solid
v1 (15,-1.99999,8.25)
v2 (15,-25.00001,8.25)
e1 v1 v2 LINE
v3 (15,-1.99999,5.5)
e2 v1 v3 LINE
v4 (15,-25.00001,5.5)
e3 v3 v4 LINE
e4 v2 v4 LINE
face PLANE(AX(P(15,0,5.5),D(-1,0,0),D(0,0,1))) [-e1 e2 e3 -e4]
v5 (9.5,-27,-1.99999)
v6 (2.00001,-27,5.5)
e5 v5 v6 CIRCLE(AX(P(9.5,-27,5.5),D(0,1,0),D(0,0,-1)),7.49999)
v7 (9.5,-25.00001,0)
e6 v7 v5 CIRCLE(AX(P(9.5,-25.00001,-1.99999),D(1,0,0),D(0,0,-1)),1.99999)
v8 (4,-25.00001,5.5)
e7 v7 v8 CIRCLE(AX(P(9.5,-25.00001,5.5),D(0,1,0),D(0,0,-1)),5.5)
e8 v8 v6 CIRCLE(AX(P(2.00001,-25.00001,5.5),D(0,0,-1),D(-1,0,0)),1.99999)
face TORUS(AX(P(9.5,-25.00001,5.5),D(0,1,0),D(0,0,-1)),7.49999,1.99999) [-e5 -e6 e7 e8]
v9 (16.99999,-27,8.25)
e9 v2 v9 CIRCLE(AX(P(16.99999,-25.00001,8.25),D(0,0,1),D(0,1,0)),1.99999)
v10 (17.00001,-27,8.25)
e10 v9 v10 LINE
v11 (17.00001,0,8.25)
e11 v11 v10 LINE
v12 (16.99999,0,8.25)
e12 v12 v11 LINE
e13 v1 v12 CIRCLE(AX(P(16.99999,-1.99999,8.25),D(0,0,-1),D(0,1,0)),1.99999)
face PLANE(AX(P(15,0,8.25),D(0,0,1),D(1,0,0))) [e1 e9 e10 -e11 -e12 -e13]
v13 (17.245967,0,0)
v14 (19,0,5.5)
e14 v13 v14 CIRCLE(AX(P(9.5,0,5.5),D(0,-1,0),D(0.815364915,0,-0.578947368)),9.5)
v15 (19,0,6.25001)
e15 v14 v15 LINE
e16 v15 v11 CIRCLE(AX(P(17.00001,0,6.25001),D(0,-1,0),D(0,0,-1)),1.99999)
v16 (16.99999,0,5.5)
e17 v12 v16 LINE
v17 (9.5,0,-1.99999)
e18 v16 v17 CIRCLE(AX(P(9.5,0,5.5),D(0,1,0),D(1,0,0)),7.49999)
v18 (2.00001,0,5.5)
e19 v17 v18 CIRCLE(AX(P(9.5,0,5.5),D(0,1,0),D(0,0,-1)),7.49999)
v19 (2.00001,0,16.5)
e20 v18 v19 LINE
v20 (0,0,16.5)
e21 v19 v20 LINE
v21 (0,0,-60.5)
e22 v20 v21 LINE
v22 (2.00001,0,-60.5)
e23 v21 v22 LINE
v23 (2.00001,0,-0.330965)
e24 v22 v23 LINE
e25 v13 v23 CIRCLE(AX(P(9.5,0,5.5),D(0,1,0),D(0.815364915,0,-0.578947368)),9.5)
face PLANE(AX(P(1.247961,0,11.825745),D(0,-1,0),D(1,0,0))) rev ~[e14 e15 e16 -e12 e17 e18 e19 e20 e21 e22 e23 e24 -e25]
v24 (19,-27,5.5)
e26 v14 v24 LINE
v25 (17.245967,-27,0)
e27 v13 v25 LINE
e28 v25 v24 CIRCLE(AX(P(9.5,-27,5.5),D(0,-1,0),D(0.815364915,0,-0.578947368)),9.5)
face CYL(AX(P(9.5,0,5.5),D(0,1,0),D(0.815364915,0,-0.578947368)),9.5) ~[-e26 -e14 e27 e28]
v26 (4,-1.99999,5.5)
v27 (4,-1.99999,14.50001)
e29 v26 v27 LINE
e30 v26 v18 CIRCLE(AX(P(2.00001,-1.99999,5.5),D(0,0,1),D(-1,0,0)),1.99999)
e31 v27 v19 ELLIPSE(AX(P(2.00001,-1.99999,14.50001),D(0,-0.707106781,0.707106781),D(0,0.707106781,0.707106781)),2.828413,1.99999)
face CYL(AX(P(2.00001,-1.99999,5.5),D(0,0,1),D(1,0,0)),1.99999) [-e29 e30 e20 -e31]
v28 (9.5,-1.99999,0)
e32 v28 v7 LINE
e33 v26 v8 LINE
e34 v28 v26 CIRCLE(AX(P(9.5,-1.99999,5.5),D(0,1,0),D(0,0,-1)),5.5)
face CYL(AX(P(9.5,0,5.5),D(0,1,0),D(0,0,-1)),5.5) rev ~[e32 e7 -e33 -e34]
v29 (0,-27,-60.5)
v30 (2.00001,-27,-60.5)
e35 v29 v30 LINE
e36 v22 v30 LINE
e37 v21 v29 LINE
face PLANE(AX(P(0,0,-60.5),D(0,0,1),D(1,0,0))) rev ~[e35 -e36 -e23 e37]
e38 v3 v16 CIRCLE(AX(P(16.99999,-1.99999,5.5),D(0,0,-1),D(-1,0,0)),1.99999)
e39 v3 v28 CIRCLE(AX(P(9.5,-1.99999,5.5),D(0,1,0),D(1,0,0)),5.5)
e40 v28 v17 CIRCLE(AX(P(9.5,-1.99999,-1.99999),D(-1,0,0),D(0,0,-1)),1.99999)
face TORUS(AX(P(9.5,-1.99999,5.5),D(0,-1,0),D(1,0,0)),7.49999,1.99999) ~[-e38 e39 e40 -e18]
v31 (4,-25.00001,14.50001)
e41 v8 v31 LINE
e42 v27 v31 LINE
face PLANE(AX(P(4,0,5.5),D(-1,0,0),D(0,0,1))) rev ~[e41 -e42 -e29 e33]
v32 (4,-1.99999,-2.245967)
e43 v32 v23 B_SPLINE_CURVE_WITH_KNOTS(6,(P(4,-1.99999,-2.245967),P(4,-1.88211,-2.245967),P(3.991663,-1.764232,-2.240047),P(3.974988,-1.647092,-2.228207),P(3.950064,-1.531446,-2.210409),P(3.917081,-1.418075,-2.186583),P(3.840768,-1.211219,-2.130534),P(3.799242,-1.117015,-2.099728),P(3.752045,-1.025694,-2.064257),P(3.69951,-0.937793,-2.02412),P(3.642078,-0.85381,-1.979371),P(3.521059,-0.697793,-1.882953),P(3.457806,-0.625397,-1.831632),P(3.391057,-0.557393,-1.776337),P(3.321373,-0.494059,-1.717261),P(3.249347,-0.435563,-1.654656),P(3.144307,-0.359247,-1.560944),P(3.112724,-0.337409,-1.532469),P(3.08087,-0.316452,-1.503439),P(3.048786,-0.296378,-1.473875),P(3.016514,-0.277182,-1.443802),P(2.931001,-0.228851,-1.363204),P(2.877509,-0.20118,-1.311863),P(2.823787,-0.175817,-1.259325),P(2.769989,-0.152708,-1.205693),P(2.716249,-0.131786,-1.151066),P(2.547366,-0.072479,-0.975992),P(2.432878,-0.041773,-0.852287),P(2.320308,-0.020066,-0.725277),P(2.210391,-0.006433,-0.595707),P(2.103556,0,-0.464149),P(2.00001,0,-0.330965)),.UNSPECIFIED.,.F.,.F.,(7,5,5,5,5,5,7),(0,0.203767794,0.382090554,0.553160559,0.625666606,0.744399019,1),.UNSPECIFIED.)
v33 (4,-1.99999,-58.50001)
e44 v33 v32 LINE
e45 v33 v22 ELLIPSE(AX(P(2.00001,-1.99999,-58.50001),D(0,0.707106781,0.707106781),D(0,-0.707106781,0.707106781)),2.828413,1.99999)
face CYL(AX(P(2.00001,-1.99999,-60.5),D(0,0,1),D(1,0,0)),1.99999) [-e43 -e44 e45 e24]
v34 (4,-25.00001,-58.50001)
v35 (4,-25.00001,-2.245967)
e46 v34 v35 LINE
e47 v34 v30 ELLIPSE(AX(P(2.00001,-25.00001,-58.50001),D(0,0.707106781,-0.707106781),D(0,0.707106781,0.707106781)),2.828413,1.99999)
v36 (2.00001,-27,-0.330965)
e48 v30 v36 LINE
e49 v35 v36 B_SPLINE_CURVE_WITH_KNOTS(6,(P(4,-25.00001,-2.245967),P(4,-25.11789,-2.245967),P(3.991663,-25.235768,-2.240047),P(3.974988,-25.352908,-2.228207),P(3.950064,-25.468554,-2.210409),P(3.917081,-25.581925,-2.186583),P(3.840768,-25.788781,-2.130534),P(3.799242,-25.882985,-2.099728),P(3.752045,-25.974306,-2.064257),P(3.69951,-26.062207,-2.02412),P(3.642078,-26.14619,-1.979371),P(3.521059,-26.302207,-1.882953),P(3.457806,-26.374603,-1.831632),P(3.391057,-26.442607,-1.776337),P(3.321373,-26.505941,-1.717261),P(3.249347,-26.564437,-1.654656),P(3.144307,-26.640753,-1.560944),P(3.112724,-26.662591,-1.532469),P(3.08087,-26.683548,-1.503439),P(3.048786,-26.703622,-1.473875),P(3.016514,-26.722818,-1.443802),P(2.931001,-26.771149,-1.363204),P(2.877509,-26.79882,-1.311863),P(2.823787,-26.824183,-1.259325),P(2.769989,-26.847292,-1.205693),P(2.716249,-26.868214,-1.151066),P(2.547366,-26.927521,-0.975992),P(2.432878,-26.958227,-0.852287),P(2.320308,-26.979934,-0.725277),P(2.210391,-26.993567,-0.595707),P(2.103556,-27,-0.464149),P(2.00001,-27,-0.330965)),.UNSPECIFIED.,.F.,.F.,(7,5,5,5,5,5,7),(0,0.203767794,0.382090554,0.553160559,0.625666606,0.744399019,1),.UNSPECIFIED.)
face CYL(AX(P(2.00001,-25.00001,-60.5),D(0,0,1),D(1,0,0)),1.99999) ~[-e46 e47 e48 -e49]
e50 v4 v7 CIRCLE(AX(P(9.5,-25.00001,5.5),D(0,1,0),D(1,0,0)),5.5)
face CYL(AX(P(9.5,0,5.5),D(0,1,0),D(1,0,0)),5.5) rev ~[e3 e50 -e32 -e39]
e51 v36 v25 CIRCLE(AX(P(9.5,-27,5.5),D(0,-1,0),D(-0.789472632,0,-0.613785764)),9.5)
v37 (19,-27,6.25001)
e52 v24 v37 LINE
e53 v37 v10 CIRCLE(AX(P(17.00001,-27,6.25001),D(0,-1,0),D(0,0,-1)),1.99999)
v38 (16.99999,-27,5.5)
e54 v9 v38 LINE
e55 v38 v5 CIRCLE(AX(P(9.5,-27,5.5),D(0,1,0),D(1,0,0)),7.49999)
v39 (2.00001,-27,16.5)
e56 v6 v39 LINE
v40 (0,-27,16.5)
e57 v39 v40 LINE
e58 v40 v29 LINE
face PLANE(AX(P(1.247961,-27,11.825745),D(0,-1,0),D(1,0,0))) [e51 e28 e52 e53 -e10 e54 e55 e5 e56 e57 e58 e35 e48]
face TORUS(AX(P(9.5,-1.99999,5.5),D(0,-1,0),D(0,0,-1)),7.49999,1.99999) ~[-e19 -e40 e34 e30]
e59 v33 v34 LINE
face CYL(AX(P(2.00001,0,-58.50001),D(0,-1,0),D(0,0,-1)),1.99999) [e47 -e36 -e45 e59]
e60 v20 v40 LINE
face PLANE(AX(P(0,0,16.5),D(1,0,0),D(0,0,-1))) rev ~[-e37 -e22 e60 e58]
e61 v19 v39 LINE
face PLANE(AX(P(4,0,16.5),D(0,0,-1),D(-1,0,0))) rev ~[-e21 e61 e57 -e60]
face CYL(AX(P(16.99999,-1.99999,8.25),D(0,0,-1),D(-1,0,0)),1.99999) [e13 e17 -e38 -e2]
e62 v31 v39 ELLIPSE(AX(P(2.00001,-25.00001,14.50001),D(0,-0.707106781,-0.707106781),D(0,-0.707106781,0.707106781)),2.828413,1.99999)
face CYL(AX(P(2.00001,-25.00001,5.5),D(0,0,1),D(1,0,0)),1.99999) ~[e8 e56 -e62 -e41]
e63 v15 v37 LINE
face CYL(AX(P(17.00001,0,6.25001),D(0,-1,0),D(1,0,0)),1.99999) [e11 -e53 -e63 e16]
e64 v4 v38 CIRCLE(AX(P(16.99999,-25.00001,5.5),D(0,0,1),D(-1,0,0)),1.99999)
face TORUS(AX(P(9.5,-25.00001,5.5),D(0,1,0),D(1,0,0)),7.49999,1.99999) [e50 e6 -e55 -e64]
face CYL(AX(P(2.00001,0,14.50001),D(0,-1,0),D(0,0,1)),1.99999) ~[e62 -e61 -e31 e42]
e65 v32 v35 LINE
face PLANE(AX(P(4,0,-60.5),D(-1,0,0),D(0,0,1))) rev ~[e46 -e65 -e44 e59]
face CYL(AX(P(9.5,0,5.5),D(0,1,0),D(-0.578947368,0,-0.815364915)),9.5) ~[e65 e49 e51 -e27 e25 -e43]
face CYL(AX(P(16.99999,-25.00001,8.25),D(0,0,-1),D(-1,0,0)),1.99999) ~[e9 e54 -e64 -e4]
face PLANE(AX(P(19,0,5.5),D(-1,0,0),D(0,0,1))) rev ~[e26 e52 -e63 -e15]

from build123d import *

# Parameters (mm, degrees)
F1_W     = 4
F1_H     = 2.75
F2_DEPTH = 27
F3_R     = 1.99999


# Not quite as in the source:
# - a fillet or chamfer is up to 0.001 mm smaller than in the source, because OpenCascade refuses the exact size


with BuildPart() as f2:
    # F1 (on Front) → F2 (new body)
    with BuildSketch(Plane.XZ):
        with BuildLine():
            Line((4, 16.5), (0, 16.5))
            Line((0, 16.5), (0, 5.5))
            ThreePointArc((0, 5.5), (1.0590284919, 9.8588989435), (4, 13.2459666924))
            Line((4, 13.2459666924), (4, 16.5))
        make_face()
        with BuildLine():
            ThreePointArc((1.7540333076, 0), (0.4491248054, 2.6135388083), (0, 5.5))
            Line((0, 5.5), (0, 0))
            Line((0, 0), (1.7540333076, 0))
        make_face()
        with BuildLine():
            Line((4, 5.5), (0, 5.5))
            ThreePointArc((0, 5.5), (0.4491248054, 2.6135388083), (1.7540333076, 0))
            Line((1.7540333076, 0), (4, 0))
            Line((4, 0), (4, 5.5))
        make_face()
        with BuildLine():
            ThreePointArc((4, 13.2459666924), (1.0590284919, 9.8588989435), (0, 5.5))
            Line((0, 5.5), (4, 5.5))
            Line((4, 5.5), (4, 13.2459666924))
        make_face()
        with BuildLine():
            Line((1.7540333076, 0), (0, 0))
            Line((0, 0), (0, -60.5))
            Line((0, -60.5), (4, -60.5))
            Line((4, -60.5), (4, -2.2459666924))
            ThreePointArc((4, -2.2459666924), (2.7824855787, -1.2175144213), (1.7540333076, 0))
        make_face()
        with BuildLine():
            Line((4, 0), (1.7540333076, 0))
            ThreePointArc((1.7540333076, 0), (2.7824855787, -1.2175144213), (4, -2.2459666924))
            Line((4, -2.2459666924), (4, 0))
        make_face()
        with BuildLine():
            ThreePointArc((9.5, 0), (5.6109127035, 1.6109127035), (4, 5.5))
            Line((4, 5.5), (4, 0))
            Line((4, 0), (9.5, 0))
        make_face()
        with BuildLine():
            Line((9.5, 0), (4, 0))
            Line((4, 0), (4, -2.2459666924))
            ThreePointArc((4, -2.2459666924), (11.0881382785, -3.8663128716), (17.2459666924, 0))
            Line((17.2459666924, 0), (9.5, 0))
        make_face()
        with BuildLine():
            ThreePointArc((15, 5.5), (13.3890872965, 1.6109127035), (9.5, 0))
            Line((9.5, 0), (17.2459666924, 0))
            ThreePointArc((17.2459666924, 0), (18.5508751946, 2.6135388083), (19, 5.5))
            Line((19, 5.5), (15, 5.5))
        make_face()
        with Locations((17, 6.875)):
            Rectangle(F1_W, F1_H)
    extrude(amount=F2_DEPTH)

    # F3 (radius 2 in the source; OpenCascade refuses exactly that, so slightly less here)
    f3_edges = [f2.edges().sort_by_distance(p)[0] for p in [
        (4, -27, -31.372983),
        (4, -27, 11),
        (4, 0, -31.372983),
        (4, -13.5, -60.5),
        (4, 0, 11),
        (19, -13.5, 8.25),
        (4, -13.5, 16.5),
    ]]
    fillet(f3_edges, radius=F3_R)


solid = f2.part
